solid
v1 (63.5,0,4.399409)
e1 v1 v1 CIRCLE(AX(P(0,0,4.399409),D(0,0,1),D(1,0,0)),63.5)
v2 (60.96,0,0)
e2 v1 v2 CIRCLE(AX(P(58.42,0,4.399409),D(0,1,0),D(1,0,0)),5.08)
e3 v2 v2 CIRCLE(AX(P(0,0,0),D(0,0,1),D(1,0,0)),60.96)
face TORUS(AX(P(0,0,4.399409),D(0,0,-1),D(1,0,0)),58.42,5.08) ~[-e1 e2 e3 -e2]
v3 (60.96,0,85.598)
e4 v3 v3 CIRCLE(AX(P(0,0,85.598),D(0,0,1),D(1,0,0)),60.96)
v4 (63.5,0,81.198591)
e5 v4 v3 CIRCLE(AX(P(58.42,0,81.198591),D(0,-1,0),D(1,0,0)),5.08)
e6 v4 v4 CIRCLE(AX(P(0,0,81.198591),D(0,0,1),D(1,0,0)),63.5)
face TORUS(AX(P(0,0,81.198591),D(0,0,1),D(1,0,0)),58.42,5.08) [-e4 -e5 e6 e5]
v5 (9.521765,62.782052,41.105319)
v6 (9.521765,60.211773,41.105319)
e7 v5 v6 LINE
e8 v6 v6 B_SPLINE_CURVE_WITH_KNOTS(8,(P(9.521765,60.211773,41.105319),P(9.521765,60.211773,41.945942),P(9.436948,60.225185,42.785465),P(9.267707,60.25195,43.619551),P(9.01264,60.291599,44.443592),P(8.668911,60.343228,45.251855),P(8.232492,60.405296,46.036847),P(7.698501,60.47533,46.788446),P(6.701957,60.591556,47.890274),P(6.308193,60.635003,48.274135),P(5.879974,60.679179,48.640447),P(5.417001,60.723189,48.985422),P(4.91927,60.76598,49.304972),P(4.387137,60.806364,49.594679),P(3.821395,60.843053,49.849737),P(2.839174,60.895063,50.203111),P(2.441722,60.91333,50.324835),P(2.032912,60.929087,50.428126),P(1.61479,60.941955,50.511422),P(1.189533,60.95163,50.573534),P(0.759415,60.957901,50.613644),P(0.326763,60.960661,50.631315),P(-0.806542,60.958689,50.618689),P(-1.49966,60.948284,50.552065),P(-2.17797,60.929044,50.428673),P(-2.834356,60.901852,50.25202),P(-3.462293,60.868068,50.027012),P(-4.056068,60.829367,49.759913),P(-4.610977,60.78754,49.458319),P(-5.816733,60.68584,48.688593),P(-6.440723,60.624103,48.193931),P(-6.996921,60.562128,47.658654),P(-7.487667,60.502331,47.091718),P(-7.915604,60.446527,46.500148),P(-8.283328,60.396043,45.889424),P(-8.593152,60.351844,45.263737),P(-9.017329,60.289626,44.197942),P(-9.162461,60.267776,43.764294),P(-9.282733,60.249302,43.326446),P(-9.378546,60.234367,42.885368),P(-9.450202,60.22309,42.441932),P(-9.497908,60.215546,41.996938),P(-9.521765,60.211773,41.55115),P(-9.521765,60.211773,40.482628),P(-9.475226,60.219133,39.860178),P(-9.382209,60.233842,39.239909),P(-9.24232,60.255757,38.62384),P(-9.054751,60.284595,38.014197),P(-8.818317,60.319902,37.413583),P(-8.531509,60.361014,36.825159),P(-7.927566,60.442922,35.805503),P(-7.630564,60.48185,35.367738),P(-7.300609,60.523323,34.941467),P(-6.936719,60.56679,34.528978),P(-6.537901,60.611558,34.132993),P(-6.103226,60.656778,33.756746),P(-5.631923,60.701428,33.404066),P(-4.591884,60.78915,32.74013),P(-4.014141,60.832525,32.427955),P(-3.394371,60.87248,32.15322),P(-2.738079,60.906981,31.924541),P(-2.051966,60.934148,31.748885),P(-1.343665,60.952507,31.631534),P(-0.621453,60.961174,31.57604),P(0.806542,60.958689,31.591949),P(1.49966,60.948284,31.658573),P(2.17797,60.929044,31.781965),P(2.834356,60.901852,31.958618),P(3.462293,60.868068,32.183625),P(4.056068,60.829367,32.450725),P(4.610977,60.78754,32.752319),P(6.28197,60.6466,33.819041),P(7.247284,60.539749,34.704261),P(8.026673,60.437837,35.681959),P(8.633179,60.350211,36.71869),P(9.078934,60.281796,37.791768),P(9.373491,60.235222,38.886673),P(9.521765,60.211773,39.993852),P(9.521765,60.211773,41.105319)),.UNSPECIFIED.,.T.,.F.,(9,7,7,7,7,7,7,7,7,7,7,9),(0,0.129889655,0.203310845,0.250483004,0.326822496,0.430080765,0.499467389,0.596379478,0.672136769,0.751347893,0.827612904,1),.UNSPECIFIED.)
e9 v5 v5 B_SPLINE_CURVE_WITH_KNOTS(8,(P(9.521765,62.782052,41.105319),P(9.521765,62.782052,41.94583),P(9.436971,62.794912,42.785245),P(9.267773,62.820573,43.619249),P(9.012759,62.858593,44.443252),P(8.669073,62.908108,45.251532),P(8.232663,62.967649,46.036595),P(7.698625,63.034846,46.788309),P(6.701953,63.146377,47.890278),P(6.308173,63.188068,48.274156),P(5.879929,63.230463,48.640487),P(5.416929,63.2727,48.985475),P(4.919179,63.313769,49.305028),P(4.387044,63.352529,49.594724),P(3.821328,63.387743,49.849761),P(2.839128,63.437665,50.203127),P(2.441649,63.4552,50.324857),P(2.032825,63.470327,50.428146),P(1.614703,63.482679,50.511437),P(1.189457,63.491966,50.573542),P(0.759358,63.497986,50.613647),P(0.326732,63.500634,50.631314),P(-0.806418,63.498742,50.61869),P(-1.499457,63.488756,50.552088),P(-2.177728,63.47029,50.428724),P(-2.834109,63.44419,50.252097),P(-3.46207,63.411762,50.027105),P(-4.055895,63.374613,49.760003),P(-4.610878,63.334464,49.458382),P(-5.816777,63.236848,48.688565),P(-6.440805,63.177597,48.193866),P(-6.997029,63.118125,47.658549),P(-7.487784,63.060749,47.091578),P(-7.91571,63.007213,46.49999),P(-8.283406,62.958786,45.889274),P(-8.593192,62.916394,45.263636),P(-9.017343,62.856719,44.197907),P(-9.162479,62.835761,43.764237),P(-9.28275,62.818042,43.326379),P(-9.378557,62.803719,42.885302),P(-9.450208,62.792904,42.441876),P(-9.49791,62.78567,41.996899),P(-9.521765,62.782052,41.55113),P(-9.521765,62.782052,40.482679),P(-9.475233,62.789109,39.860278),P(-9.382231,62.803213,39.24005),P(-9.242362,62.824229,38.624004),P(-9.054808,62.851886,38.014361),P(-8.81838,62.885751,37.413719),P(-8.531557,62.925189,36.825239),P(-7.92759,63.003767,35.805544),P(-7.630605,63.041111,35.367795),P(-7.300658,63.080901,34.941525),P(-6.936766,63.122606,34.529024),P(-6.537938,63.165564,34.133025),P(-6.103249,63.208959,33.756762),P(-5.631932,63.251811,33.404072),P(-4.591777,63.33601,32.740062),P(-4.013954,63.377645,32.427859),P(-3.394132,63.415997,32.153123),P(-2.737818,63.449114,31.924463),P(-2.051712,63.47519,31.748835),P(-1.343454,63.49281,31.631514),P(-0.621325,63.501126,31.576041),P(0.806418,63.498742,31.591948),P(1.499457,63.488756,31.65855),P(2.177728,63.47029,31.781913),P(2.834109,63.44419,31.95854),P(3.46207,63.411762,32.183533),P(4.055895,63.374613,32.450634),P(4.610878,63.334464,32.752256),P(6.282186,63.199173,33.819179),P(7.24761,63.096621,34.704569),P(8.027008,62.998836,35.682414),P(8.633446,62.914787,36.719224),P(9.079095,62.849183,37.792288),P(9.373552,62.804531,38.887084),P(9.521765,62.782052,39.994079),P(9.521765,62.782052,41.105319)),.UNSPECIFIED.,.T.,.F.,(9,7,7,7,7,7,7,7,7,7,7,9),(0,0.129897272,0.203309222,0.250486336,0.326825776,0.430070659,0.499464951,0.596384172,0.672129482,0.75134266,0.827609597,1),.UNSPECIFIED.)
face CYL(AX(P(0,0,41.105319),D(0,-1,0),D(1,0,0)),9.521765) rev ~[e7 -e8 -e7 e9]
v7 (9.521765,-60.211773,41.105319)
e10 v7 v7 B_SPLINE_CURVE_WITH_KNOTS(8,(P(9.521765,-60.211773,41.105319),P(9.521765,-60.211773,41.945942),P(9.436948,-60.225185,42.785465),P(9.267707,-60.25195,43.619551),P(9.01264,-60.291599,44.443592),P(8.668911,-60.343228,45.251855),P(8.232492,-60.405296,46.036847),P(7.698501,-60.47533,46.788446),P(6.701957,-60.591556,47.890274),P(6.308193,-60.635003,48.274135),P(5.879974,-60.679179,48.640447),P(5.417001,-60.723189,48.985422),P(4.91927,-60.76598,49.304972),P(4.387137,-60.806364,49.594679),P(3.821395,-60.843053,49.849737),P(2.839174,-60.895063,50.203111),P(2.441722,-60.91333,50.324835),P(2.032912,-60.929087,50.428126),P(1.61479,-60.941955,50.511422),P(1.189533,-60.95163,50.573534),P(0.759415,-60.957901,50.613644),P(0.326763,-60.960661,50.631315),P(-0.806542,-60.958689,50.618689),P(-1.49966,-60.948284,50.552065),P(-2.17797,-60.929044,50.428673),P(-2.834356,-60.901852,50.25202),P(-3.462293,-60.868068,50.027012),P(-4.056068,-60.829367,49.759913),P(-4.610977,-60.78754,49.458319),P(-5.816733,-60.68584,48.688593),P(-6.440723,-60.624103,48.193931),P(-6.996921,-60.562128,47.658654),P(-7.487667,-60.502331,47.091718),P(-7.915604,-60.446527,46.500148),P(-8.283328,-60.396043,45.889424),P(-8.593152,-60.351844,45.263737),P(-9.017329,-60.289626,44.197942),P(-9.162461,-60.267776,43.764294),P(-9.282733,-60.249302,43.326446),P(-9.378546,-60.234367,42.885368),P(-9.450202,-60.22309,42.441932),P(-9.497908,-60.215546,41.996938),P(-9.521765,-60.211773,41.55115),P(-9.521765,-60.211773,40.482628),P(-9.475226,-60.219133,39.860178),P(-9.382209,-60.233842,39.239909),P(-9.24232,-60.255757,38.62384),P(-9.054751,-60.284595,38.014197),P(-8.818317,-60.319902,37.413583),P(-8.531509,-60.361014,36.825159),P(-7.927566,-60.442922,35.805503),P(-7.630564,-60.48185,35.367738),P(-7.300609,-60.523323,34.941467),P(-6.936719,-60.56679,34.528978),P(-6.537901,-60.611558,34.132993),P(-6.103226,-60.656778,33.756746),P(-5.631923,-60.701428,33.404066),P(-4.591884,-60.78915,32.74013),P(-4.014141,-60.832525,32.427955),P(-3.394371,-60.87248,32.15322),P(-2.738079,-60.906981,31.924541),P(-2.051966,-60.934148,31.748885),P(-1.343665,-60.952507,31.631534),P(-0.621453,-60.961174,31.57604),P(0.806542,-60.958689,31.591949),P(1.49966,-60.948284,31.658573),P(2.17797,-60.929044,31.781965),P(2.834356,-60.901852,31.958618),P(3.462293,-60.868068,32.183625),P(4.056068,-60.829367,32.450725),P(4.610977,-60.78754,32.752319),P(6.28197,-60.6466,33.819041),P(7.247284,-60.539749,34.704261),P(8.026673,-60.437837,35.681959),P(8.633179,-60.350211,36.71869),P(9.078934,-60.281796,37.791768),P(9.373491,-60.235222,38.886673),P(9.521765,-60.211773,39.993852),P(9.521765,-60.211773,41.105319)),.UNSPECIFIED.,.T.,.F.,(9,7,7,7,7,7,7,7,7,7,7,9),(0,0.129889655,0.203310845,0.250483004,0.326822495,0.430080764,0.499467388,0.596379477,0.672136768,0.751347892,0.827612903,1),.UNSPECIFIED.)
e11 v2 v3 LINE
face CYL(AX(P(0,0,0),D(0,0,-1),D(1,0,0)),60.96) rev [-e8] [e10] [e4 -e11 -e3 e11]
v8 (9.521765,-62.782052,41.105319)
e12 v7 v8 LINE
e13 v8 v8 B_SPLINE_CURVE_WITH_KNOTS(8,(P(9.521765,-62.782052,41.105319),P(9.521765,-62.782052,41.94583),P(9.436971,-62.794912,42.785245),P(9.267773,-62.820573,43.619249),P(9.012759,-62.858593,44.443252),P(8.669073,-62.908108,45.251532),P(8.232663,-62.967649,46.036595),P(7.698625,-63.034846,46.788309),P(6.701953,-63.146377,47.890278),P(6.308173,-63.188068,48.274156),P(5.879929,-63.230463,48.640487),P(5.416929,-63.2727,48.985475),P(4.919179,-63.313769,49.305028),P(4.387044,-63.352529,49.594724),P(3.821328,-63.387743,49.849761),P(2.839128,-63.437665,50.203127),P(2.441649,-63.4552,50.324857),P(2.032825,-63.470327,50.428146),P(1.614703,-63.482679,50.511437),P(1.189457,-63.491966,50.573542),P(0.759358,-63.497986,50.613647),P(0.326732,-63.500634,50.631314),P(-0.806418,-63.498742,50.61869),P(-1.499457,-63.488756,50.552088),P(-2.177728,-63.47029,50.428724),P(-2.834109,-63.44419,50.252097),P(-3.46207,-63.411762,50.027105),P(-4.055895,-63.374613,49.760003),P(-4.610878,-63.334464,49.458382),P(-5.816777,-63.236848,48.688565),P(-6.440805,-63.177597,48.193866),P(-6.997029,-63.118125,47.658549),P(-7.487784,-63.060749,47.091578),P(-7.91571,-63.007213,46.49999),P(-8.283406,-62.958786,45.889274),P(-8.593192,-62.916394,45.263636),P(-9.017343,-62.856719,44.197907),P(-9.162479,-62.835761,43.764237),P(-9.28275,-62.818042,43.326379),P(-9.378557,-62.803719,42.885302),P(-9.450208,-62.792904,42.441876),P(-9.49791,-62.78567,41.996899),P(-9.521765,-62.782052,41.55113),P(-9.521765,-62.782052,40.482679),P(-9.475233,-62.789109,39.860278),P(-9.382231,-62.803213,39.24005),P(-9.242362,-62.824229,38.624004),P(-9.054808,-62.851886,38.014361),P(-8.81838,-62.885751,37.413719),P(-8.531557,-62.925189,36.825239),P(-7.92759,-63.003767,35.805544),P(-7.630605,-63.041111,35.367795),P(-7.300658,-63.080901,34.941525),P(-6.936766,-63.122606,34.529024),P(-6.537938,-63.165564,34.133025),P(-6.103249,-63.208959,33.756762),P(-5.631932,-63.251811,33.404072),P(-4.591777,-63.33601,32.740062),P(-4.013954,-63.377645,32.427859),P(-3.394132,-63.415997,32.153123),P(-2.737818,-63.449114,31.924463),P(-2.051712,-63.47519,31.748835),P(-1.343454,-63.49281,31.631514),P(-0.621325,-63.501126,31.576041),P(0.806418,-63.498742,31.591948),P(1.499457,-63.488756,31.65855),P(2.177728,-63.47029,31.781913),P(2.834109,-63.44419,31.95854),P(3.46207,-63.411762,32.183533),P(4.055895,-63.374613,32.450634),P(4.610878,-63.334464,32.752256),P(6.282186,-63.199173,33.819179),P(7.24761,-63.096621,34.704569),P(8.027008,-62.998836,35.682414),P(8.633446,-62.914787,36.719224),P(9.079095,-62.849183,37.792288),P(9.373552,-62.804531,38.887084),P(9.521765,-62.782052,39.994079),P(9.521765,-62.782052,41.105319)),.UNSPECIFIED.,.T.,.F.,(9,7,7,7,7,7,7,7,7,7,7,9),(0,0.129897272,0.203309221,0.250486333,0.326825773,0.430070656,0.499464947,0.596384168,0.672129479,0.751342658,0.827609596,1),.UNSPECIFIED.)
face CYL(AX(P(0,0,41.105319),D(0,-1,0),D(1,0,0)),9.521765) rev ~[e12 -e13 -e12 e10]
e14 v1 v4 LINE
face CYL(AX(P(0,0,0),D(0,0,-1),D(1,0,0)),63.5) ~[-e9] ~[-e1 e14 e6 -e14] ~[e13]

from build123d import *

# Parameters (mm, degrees)
F0_R     = 63.5
F1_DEPTH = 85.598
F2_T     = -2.54
F3_R     = 9.5217645964
F4_DEPTH = 92.964


# Not quite as in the source:
# - a fillet or chamfer that OpenCascade refuses, or shapes differently, is made with other operations: its cross-section is extruded or revolved along the edge and cut away or added


with BuildPart() as f1:
    # F0 (on Top) → F1 (new body)
    with BuildSketch(Plane.XY):
        Circle(F0_R)
    extrude(amount=F1_DEPTH)

    # F2
    f2_openings = [f1.faces().sort_by_distance(p)[0] for p in [
        (0, 0, 85.598),
        (0, 0, 0),
    ]]
    offset(amount=F2_T, openings=f2_openings)

    # F3 (on Front) → F4 (cut, symmetric)
    with BuildSketch(Plane.XZ):
        with Locations((0, 41.1053188145)):
            Circle(F3_R)
    extrude(amount=F4_DEPTH, both=True, mode=Mode.SUBTRACT)

    # F5: fillet of radius 5.08 on 2 edges, made by hand

    # F5_s1 → F5_t2 (revolve, cut)
    with BuildSketch(Plane.XZ):
        with BuildLine():
            ThreePointArc((63.5, 81.1985909488), (62.8194090512, 83.7385909488), (60.96, 85.598))
            Line((60.96, 85.598), (63.5, 85.598))
            Line((63.5, 85.598), (63.5, 81.1985909488))
        make_face()
    revolve(axis=Axis((0, 0, 85.598), (0, 0, 1)), mode=Mode.SUBTRACT)

    # F5_s3 → F5_t4 (revolve, cut)
    with BuildSketch(Plane.XZ):
        with BuildLine():
            ThreePointArc((63.5, 4.3994090512), (62.8194090512, 1.8594090512), (60.96, 0))
            Line((60.96, 0), (63.5, 0))
            Line((63.5, 0), (63.5, 4.3994090512))
        make_face()
    revolve(axis=Axis((0, 0, 0), (0, 0, 1)), mode=Mode.SUBTRACT)


solid = f1.part
